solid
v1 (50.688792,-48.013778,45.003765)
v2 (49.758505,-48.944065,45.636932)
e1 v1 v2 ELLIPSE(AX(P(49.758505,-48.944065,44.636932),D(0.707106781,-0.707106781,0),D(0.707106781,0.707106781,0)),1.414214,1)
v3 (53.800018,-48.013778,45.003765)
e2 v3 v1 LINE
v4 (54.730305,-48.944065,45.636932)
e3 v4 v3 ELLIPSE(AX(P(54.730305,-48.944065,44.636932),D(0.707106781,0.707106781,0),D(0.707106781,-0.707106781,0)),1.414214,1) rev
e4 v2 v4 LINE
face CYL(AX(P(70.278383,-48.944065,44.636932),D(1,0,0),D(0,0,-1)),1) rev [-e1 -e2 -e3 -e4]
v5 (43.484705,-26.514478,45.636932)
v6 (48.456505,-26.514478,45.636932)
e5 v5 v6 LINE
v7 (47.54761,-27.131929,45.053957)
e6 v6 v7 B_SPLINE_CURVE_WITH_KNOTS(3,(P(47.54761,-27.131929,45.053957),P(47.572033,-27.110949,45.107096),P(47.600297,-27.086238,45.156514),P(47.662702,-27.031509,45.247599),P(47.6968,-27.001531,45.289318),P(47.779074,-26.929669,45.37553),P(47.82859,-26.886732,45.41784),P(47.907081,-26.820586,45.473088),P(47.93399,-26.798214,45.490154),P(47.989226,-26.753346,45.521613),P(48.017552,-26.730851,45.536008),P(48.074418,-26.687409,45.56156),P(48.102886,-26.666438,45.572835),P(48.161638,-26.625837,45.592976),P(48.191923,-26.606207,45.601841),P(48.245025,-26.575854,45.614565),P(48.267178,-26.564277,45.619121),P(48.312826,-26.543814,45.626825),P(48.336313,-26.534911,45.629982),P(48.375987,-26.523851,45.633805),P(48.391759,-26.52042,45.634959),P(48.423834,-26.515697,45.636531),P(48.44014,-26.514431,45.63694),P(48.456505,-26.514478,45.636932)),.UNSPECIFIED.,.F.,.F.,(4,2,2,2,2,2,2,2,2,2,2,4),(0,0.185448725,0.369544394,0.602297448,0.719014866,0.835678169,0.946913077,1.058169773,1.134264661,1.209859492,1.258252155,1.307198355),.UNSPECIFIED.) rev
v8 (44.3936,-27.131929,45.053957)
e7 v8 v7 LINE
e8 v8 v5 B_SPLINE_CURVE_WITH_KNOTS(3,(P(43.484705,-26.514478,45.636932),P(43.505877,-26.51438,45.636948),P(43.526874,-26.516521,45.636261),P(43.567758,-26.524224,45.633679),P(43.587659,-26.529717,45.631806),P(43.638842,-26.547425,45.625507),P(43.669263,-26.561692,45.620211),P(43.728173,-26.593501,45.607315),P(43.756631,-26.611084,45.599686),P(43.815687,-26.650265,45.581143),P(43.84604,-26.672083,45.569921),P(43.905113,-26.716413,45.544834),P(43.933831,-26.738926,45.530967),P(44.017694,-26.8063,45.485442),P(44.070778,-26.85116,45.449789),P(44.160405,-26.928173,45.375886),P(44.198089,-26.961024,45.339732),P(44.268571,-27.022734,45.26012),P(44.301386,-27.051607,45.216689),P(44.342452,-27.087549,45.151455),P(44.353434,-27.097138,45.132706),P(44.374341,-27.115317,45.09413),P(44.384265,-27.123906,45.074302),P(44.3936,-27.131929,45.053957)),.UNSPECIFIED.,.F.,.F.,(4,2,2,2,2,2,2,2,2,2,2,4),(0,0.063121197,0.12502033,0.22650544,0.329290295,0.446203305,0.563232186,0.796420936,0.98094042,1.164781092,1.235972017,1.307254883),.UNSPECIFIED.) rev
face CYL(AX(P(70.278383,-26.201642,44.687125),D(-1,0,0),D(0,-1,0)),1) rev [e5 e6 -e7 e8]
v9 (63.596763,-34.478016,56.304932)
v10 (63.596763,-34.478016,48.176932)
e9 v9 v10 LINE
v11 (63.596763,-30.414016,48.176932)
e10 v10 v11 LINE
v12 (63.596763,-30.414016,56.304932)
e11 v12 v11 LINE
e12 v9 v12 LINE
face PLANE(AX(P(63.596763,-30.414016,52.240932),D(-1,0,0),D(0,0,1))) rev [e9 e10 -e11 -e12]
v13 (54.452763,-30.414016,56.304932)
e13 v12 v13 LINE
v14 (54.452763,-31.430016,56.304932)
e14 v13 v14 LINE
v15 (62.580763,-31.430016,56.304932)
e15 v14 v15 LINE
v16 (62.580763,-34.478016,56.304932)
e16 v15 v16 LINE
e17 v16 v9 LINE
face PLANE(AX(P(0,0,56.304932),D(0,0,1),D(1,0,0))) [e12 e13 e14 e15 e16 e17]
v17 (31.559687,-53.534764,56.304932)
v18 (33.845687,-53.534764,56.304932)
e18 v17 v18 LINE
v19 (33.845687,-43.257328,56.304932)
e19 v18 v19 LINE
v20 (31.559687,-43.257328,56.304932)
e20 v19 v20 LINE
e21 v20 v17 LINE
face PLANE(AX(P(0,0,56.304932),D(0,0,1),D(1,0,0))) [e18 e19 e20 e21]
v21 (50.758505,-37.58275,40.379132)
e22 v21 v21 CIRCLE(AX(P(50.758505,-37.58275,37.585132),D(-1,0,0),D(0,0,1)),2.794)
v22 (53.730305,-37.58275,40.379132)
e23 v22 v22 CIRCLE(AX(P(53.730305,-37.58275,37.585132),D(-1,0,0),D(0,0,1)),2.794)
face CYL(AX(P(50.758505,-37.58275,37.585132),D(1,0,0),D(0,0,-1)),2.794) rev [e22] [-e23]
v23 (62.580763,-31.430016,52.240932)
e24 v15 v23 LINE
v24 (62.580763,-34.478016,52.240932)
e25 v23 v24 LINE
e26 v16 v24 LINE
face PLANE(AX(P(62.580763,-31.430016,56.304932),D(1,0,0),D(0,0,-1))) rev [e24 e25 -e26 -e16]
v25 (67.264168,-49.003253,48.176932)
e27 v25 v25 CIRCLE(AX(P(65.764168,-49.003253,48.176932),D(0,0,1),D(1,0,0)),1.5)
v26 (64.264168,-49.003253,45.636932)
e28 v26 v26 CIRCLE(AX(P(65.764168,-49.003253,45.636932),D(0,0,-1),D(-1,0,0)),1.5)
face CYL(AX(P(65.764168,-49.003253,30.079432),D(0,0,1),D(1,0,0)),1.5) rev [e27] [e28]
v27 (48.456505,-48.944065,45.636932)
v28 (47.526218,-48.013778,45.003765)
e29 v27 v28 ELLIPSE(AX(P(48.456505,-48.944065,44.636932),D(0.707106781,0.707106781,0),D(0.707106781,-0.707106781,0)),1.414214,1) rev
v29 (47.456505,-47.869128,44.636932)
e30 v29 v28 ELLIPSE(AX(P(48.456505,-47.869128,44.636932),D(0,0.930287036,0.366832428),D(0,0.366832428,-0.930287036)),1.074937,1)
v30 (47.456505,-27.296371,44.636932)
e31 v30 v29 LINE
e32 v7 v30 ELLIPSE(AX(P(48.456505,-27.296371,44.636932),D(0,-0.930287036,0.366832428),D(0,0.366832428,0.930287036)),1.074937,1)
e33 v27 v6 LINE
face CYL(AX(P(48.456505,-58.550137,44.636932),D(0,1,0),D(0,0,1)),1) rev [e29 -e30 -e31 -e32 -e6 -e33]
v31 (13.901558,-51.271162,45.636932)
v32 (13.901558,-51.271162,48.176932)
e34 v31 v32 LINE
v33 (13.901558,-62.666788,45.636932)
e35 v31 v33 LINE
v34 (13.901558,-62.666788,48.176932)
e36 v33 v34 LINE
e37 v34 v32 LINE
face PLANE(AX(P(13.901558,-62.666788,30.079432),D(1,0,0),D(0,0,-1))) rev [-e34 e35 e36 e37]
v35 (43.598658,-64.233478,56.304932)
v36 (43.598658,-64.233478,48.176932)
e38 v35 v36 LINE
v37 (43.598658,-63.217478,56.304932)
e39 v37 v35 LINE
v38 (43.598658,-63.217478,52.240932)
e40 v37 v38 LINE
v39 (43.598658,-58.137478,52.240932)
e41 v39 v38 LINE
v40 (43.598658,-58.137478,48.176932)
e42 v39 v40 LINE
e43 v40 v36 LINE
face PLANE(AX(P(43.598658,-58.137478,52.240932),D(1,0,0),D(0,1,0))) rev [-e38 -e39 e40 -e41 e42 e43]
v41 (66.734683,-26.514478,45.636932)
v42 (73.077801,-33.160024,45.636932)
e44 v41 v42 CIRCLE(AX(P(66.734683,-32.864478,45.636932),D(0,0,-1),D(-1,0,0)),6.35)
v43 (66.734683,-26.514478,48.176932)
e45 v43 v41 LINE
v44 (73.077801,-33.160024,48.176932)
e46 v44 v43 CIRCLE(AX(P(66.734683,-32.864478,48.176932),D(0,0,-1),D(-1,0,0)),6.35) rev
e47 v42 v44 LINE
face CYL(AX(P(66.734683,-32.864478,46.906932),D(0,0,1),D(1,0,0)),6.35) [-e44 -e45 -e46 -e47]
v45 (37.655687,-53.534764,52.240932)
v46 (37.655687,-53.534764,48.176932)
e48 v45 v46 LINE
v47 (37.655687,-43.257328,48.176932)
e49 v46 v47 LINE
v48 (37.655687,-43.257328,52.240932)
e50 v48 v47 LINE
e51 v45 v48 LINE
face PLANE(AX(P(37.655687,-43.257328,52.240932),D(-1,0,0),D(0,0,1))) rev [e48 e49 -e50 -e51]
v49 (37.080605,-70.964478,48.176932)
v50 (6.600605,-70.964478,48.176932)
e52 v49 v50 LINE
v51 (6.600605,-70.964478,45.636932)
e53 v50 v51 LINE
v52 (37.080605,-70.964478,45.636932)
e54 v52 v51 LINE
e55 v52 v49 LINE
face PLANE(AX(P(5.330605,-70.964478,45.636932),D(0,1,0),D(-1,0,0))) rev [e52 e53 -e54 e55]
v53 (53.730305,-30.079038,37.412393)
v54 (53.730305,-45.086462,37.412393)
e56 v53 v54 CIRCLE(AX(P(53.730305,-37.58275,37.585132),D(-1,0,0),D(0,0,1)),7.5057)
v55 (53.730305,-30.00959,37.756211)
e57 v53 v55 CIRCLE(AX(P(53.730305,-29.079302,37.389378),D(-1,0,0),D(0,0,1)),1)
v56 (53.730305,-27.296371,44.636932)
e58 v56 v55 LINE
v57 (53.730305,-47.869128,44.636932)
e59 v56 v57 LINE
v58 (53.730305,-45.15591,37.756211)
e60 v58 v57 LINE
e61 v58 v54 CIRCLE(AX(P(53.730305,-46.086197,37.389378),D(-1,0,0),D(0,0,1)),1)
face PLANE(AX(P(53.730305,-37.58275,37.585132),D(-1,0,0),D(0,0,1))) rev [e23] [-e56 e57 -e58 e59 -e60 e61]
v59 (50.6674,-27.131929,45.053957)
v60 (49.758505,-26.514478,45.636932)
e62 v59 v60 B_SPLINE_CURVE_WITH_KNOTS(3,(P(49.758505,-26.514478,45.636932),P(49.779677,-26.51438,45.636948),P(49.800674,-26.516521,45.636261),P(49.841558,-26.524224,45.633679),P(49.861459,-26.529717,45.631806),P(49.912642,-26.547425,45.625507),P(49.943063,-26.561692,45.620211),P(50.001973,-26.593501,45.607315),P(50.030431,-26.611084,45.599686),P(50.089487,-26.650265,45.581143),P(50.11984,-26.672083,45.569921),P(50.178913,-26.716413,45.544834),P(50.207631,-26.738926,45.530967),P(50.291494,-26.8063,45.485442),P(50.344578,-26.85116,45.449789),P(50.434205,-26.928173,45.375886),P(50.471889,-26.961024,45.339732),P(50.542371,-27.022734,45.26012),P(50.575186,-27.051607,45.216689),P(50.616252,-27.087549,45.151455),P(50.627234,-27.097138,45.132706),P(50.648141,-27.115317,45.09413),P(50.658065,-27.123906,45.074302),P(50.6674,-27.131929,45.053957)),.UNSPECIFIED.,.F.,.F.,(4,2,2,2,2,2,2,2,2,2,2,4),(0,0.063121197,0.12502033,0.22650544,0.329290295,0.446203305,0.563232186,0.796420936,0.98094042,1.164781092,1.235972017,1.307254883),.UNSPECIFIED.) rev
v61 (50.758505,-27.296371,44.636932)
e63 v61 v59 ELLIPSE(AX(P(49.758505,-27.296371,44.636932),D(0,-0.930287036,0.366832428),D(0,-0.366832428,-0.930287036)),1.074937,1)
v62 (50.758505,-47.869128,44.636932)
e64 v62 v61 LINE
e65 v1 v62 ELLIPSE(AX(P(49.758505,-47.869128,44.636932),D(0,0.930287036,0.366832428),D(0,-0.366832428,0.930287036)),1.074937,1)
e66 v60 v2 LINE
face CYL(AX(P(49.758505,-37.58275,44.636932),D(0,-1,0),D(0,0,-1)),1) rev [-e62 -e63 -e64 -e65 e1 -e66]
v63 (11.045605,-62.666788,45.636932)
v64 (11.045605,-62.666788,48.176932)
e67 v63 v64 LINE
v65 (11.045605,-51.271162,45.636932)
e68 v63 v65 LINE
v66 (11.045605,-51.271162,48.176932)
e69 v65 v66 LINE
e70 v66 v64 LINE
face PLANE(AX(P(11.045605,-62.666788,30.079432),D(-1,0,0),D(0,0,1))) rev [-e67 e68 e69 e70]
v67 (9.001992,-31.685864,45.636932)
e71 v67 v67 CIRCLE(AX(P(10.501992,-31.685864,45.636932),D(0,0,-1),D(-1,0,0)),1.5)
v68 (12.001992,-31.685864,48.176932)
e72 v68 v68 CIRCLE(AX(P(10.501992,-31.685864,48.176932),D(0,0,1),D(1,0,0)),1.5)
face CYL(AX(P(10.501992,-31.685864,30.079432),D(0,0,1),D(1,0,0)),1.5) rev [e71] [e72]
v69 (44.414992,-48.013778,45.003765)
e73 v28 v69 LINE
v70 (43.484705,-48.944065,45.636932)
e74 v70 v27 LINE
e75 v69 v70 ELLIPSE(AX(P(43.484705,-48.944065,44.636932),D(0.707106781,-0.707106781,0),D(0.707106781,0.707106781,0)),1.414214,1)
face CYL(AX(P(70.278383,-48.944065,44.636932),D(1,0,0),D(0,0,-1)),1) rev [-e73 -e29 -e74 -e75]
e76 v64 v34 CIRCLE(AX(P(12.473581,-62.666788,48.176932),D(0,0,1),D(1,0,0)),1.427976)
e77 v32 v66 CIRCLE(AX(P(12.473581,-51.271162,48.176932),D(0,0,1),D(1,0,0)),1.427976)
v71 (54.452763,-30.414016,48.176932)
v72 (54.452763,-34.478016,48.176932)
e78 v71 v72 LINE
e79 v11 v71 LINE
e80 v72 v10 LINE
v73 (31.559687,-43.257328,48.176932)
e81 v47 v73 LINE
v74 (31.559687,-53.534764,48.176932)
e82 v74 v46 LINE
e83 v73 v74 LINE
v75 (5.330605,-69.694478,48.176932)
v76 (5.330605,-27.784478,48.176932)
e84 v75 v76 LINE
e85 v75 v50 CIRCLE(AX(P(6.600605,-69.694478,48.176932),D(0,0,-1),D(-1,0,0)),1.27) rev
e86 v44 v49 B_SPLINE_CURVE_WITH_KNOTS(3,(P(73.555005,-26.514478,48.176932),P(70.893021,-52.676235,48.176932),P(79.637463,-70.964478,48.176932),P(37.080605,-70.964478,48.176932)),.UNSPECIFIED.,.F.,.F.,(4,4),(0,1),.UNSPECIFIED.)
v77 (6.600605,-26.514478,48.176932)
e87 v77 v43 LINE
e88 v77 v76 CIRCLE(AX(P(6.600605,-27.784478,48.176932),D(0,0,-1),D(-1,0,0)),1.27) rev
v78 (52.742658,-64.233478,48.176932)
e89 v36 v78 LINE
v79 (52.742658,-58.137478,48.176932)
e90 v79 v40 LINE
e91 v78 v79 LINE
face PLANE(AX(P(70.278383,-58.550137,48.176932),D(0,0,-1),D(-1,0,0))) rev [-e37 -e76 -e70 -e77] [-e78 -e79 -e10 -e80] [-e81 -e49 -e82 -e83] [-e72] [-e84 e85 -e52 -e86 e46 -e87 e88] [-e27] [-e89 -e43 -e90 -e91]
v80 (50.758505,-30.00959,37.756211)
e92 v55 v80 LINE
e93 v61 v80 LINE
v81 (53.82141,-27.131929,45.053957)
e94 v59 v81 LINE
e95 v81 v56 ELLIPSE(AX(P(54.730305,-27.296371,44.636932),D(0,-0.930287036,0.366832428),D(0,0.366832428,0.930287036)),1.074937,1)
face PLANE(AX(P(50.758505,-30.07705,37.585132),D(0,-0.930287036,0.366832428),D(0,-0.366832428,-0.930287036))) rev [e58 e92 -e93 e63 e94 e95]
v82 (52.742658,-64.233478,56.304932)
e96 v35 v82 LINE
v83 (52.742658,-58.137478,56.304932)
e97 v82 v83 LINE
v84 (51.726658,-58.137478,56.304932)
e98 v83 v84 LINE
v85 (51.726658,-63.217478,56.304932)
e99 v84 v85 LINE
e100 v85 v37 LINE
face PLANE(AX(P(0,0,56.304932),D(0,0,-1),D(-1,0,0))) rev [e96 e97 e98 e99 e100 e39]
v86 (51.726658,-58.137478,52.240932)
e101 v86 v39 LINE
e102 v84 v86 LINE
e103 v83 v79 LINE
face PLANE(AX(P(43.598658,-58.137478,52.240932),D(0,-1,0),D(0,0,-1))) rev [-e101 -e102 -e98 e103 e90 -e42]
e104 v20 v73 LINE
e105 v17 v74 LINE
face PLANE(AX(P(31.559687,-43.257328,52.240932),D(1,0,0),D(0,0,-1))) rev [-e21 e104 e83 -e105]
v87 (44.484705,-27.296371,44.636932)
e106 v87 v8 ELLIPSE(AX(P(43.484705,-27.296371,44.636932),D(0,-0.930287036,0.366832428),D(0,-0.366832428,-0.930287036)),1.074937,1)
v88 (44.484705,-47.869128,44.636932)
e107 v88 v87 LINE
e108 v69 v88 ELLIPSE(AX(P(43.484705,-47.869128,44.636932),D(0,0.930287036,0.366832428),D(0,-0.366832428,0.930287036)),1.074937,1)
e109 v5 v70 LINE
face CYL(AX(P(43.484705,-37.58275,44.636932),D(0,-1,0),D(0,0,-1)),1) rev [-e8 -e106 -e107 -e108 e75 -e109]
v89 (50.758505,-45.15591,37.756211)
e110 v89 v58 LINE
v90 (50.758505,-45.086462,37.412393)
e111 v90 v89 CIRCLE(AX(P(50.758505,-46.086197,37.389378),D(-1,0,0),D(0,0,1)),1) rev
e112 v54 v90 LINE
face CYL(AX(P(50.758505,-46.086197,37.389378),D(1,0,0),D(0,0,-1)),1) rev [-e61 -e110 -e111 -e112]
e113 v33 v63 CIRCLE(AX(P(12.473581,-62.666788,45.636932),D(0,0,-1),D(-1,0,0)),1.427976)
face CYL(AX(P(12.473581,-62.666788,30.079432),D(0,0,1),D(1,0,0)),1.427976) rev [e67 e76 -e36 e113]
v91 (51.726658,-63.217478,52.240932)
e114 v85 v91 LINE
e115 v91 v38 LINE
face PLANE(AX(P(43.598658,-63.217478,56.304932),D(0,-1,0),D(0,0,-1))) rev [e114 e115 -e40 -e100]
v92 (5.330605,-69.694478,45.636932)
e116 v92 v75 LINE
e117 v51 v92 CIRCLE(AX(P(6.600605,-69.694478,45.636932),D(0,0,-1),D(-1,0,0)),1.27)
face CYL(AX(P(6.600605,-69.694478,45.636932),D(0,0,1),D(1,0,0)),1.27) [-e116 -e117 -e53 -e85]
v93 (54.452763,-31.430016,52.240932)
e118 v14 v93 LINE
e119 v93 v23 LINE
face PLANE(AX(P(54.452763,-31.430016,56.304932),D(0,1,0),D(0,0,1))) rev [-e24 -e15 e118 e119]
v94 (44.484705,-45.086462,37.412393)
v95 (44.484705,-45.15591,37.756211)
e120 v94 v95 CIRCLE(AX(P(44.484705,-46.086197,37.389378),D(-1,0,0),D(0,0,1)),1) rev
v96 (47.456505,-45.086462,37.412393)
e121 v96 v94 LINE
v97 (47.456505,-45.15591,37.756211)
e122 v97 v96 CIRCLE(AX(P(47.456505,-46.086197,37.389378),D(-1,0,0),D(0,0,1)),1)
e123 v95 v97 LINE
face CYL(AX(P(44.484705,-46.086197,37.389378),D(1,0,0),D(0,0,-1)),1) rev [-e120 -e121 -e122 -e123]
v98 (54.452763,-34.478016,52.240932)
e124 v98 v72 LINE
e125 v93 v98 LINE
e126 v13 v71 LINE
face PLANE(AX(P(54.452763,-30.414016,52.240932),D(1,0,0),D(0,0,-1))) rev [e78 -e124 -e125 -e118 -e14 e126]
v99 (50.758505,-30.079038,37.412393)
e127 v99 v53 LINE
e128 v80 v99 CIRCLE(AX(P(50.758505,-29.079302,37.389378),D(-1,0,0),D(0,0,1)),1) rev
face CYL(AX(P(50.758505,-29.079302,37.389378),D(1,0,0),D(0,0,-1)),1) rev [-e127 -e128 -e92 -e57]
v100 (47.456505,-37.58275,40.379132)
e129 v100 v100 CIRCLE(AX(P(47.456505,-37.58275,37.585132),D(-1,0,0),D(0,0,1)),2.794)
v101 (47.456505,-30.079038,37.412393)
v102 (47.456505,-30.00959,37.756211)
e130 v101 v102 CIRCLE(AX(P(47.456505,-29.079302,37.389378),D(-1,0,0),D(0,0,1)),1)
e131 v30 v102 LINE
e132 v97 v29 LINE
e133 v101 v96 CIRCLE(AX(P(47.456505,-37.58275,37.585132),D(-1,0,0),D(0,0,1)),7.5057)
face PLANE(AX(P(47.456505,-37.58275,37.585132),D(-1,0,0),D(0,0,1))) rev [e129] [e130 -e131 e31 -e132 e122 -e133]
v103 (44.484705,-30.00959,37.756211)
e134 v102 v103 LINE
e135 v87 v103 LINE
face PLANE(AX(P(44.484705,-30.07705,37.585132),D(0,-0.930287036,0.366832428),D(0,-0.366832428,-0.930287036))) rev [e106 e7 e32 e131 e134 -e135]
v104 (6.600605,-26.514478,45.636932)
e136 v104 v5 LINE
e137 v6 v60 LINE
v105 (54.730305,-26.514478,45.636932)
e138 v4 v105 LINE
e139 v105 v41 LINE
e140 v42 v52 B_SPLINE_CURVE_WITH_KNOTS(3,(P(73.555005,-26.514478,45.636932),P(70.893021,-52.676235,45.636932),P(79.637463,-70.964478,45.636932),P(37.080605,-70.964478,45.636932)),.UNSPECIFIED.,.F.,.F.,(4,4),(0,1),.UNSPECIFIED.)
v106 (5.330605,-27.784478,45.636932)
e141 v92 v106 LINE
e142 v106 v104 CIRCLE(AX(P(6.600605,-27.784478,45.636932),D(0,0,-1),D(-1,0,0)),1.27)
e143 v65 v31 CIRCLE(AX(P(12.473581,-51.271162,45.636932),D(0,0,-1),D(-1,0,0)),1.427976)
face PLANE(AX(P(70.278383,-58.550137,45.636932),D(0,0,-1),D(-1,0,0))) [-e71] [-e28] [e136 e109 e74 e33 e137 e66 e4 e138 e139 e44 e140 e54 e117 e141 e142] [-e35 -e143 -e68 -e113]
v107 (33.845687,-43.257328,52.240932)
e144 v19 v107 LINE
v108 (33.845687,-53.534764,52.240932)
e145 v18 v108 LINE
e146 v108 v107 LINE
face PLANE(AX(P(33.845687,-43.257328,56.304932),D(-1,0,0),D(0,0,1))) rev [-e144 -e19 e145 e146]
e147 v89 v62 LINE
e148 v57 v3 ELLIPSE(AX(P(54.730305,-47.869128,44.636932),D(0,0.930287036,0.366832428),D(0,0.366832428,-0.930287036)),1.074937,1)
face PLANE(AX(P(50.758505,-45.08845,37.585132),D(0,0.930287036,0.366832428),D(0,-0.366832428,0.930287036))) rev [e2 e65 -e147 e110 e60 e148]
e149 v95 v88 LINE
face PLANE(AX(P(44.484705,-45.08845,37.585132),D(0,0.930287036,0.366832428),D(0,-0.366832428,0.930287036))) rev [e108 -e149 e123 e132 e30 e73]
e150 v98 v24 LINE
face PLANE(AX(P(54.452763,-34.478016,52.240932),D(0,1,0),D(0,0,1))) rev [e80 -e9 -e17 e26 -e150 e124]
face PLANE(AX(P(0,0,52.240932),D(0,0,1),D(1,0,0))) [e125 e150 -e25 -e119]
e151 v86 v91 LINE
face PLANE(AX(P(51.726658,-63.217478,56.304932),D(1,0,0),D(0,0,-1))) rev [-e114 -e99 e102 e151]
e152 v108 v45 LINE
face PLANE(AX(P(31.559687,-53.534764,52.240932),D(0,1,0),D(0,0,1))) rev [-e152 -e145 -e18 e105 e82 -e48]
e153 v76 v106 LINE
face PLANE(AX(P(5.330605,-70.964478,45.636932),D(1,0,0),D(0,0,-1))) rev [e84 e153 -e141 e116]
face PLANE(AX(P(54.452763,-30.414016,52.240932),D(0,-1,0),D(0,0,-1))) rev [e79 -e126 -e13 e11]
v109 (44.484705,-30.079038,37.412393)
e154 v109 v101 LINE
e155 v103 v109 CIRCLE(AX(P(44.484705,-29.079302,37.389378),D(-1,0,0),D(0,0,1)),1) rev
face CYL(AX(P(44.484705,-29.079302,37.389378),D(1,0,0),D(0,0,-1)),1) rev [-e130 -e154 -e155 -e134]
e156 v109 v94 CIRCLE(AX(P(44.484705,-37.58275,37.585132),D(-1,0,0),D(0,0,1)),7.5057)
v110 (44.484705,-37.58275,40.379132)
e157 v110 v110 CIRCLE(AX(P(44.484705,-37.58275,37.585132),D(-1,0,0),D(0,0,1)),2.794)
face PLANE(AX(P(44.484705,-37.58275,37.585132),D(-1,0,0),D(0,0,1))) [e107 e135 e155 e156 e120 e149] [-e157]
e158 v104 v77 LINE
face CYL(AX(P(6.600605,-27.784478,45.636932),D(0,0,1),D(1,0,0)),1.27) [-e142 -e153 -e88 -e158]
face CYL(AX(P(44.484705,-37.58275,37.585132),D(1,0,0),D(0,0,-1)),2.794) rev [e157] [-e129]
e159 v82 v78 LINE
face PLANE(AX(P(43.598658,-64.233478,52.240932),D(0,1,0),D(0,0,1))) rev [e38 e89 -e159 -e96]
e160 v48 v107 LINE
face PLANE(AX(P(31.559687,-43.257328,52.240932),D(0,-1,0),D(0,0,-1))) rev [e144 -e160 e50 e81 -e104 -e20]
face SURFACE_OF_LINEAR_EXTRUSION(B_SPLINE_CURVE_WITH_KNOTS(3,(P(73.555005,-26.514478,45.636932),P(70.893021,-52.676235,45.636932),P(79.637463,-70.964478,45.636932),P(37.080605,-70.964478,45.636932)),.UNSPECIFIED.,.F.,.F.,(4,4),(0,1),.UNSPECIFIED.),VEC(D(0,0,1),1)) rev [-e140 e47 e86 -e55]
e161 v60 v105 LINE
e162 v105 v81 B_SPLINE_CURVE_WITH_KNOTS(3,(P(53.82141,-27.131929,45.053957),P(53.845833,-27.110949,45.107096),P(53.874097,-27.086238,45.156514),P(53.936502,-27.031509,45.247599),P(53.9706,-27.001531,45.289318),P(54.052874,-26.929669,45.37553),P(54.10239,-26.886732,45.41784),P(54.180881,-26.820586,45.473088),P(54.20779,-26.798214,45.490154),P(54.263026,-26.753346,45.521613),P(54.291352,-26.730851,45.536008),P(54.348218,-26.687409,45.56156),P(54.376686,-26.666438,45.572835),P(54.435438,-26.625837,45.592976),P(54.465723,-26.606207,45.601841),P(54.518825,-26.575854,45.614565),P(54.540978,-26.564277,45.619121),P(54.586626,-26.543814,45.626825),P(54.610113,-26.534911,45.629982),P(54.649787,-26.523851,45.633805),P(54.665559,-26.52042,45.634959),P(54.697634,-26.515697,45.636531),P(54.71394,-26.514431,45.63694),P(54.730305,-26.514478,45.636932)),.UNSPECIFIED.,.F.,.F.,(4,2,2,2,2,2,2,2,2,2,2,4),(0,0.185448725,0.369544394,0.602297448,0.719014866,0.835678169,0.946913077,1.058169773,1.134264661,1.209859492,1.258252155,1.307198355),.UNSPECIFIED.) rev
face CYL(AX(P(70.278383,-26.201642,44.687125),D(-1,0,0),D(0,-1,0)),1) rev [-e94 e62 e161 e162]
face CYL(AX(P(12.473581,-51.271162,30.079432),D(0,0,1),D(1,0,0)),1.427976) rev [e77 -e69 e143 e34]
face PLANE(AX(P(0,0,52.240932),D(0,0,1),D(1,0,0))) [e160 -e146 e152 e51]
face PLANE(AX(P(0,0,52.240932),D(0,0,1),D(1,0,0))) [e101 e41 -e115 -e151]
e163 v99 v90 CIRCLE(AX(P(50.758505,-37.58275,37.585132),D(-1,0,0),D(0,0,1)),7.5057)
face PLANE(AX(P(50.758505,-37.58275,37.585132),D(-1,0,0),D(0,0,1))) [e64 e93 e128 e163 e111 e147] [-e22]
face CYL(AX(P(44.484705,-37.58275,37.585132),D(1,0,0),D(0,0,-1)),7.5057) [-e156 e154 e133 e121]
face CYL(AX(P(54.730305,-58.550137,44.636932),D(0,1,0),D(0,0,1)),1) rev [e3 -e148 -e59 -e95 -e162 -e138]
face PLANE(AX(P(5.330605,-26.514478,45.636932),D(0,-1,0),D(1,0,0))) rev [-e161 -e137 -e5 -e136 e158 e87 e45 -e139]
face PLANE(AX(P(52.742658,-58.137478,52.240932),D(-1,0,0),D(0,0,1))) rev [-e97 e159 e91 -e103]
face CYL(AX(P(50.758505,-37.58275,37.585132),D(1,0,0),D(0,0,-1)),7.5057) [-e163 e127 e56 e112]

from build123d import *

# Parameters (mm, degrees)
BOSS_EXTRUDE1_DEPTH = 2.54
SKETCH8_R           = 2.794
BOSS_EXTRUDE5_DEPTH = 1.4859
SKETCH9_R           = 2.794
BOSS_EXTRUDE6_DEPTH = 1.4859
FILLET1_R           = 6.35
FILLET2_R           = 1.27
SKETCH11_R          = 1.5
CUT_EXTRUDE1_DEPTH  = 104.464232939
CUT_EXTRUDE3_DEPTH  = 104.464232939
SKETCH14_W          = 9.144
SKETCH14_H          = 6.096
SKETCH14_W_2        = 6.096
SKETCH14_H_2        = 10.277436068
SKETCH14_H_3        = 4.064
BOSS_EXTRUDE7_DEPTH = 4.064
SKETCH15_W          = 2.286
SKETCH15_H          = 10.277436068
BOSS_EXTRUDE8_DEPTH = 4.064
FILLET3_R           = 1


with BuildPart() as part:
    # Sketch3 → Boss-Extrude1 (new body)
    with BuildSketch(Plane(origin=(0, 0, 48.176932074), x_dir=(-1, 0, 0), z_dir=(0, 0, -1))):
        with BuildLine():
            Line((-5.330605085, -70.964477634), (-5.330605085, -26.514477634))
            Line((-5.330605085, -26.514477634), (-73.555005085, -26.514477634))
            add(Edge.make_bspline(
                [(-37.080605085, -70.964477634), (-79.637463047, -70.964477634), (-70.893021391, -52.676234808), (-73.555005085, -26.514477634)],
                knots=[0, 0, 0, 0, 1, 1, 1, 1], degree=3))
            Line((-37.080605085, -70.964477634), (-5.330605085, -70.964477634))
        make_face()
    extrude(amount=BOSS_EXTRUDE1_DEPTH)

    # Sketch8 → Boss-Extrude5 (add, symmetric)
    with BuildSketch(Plane.ZY.offset(-45.970605085)):
        with BuildLine():
            Line((45.636932074, -45.088449611), (45.636932074, -30.077049611))
            Line((45.636932074, -30.077049611), (45.636932074, -26.902049611))
            Line((45.636932074, -26.902049611), (37.585132074, -30.077049611))
            ThreePointArc((37.585132074, -30.077049611), (30.079432074, -37.582749611), (37.585132074, -45.088449611))
            Line((37.585132074, -45.088449611), (45.636932074, -48.263449611))
            Line((45.636932074, -48.263449611), (45.636932074, -45.088449611))
        make_face()
        with Locations((37.585132074, -37.582749611)):
            Circle(SKETCH8_R, mode=Mode.SUBTRACT)
    extrude(amount=BOSS_EXTRUDE5_DEPTH, both=True)

    # Sketch9 → Boss-Extrude6 (add, symmetric)
    with BuildSketch(Plane.ZY.offset(-52.244405085)):
        with BuildLine():
            Line((37.585132074, -30.077049611), (45.636932074, -26.902049611))
            Line((45.636932074, -26.902049611), (45.636932074, -30.077049611))
            Line((45.636932074, -30.077049611), (45.636932074, -45.088449611))
            Line((45.636932074, -45.088449611), (45.636932074, -48.263449611))
            Line((45.636932074, -48.263449611), (37.585132074, -45.088449611))
            ThreePointArc((37.585132074, -45.088449611), (30.079432074, -37.582749611), (37.585132074, -30.077049611))
        make_face()
        with Locations((37.585132074, -37.582749611)):
            Circle(SKETCH9_R, mode=Mode.SUBTRACT)
    extrude(amount=BOSS_EXTRUDE6_DEPTH, both=True)

    # Fillet1
    fillet1_edges = [part.edges().sort_by_distance(p)[0] for p in [
        (73.555005085, -26.514477634, 46.906932074),
    ]]
    fillet(fillet1_edges, radius=FILLET1_R)

    # Fillet2
    fillet2_edges = [part.edges().sort_by_distance(p)[0] for p in [
        (5.330605085, -26.514477634, 46.906932074),
        (5.330605085, -70.964477634, 46.906932074),
    ]]
    fillet(fillet2_edges, radius=FILLET2_R)

    # Sketch11 → Cut-Extrude1 (cut, through all)
    with BuildSketch(Plane.XY.offset(48.176932074)):
        with Locations((10.501991532, -31.685864082)):
            Circle(SKETCH11_R)
        with Locations((65.764167989, -49.003253007)):
            Circle(SKETCH11_R)
    extrude(amount=-CUT_EXTRUDE1_DEPTH, mode=Mode.SUBTRACT)

    # Sketch13 → Cut-Extrude3 (cut, through all)
    with BuildSketch(Plane.XY.offset(48.176932074)):
        with BuildLine():
            Line((11.045605085, -62.666787944), (11.045605085, -51.271162116))
            ThreePointArc((11.045605085, -51.271162116), (12.473581383, -49.843185817), (13.901557682, -51.271162116))
            Line((13.901557682, -51.271162116), (13.901557682, -62.666787944))
            ThreePointArc((13.901557682, -62.666787944), (12.473581383, -64.094764243), (11.045605085, -62.666787944))
        make_face()
    extrude(amount=-CUT_EXTRUDE3_DEPTH, mode=Mode.SUBTRACT)

    # Sketch14 → Boss-Extrude7 (add)
    with BuildSketch(Plane.XY.offset(48.176932074)):
        with Locations((48.170658264, -61.185477634)):
            Rectangle(SKETCH14_W, SKETCH14_H)
        with Locations((34.607686971, -48.396046186)):
            Rectangle(SKETCH14_W_2, SKETCH14_H_2)
        with Locations((59.024762651, -32.446016036)):
            Rectangle(SKETCH14_W, SKETCH14_H_3)
    extrude(amount=BOSS_EXTRUDE7_DEPTH)

    # Sketch15 → Boss-Extrude8 (add)
    with BuildSketch(Plane.XY.offset(52.240932074)):
        with Locations((32.702686971, -48.396046186)):
            Rectangle(SKETCH15_W, SKETCH15_H)
        Polygon((54.452762651, -30.414016036), (54.452762651, -31.430016036), (62.580762651, -31.430016036), (62.580762651, -34.478016036), (63.596762651, -34.478016036), (63.596762651, -30.414016036), align=None)
        Polygon((43.598658264, -63.217477634), (51.726658264, -63.217477634), (51.726658264, -58.137477634), (52.742658264, -58.137477634), (52.742658264, -64.233477634), (43.598658264, -64.233477634), align=None)
    extrude(amount=BOSS_EXTRUDE8_DEPTH)

    # Fillet3
    # the kernel refuses this fillet: 1 mm, written as the material it adds along each edge
    with BuildSketch(Plane(origin=(44.484705085, -24.402049611, 45.636932074), x_dir=(-1, 0, 0), z_dir=(0, -1, 0))) as fillet3_piece_1_section:
        with BuildLine():
            CenterArc((FILLET3_R, FILLET3_R), FILLET3_R, 180, 90)
            Line((0, FILLET3_R), (-FILLET3_R * 0.02, FILLET3_R))
            Line((-FILLET3_R * 0.02, FILLET3_R), (-FILLET3_R * 0.02, -FILLET3_R * 0.02))
            Line((-FILLET3_R * 0.02, -FILLET3_R * 0.02), (FILLET3_R, -FILLET3_R * 0.02))
            Line((FILLET3_R, -FILLET3_R * 0.02), (FILLET3_R, 0))
        make_face()
    fillet3_piece_1 = extrude(amount=26.3614, mode=Mode.PRIVATE)
    fillet3_piece_1 = split(fillet3_piece_1, bisect_by=Plane(origin=(44.257287749, -28.415977986, 41.797609716), z_dir=(0, -0.9302870363838799, 0.36683242759616796)), keep=Keep.TOP, mode=Mode.PRIVATE)
    fillet3_piece_1 = split(fillet3_piece_1, bisect_by=Plane(origin=(44.257287749, -46.749521237, 41.797609716), z_dir=(0, 0.9302870363838802, 0.36683242759616724)), keep=Keep.TOP, mode=Mode.PRIVATE)
    add(fillet3_piece_1)
    with BuildSketch(Plane(origin=(47.456505085, -30.077049611, 37.585132074), x_dir=(0, -0.011507965676518926, -0.9999337811705274), z_dir=(-1, 0, 0)), Plane(origin=(44.484705085, -45.088449611, 37.585132074), x_dir=(0, 0.011507965676519873, -0.9999337811705273), z_dir=(1, 0, 0)), Plane(origin=(53.730305085, -30.077049611, 37.585132074), x_dir=(0, -0.011507965676498363, -0.9999337811705276), z_dir=(-1, 0, 0))) as fillet3_piece_2:
        with BuildLine():
            CenterArc((0.184258642, -0.999933781), FILLET3_R, 90.659372418, 20.20165218)
            Line((-0.171843783, -0.065486852), (-0.178965832, -0.046797914))
            Line((-0.178965832, -0.046797914), (-0.007122049, 0.018688939))
            Line((-0.007122049, 0.018688939), (0.000230159, 0.019998676))
            ThreePointArc((0.000230159, 0.019998676), (0.086375338, 0.019502981), (0.172520517, 0.019998676))
            Line((0.172520517, 0.019998676), (0.172750676, 0))
        make_face()
    extrude(amount=2.9718)
    with BuildSketch(Plane(origin=(47.456505085, -50.763449611, 45.636932074), x_dir=(1, 0, 0), z_dir=(0, 1, 0))) as fillet3_piece_3_section:
        with BuildLine():
            CenterArc((FILLET3_R, FILLET3_R), FILLET3_R, 180, 90)
            Line((0, FILLET3_R), (-FILLET3_R * 0.02, FILLET3_R))
            Line((-FILLET3_R * 0.02, FILLET3_R), (-FILLET3_R * 0.02, -FILLET3_R * 0.02))
            Line((-FILLET3_R * 0.02, -FILLET3_R * 0.02), (FILLET3_R, -FILLET3_R * 0.02))
            Line((FILLET3_R, -FILLET3_R * 0.02), (FILLET3_R, 0))
        make_face()
    fillet3_piece_3 = extrude(amount=26.3614, mode=Mode.PRIVATE)
    fillet3_piece_3 = split(fillet3_piece_3, bisect_by=Plane(origin=(47.68392242, -28.415977986, 41.797609716), z_dir=(0, -0.9302870363838799, 0.36683242759616796)), keep=Keep.TOP, mode=Mode.PRIVATE)
    fillet3_piece_3 = split(fillet3_piece_3, bisect_by=Plane(origin=(47.68392242, -46.749521237, 41.797609716), z_dir=(0, 0.9302870363838802, 0.36683242759616724)), keep=Keep.TOP, mode=Mode.PRIVATE)
    add(fillet3_piece_3)
    with BuildSketch(Plane(origin=(44.484705085, -48.263449611, 45.636932074), x_dir=(0, -1, 0), z_dir=(1, 0, 0)), Plane(origin=(50.758505085, -48.263449611, 45.636932074), x_dir=(0, -1, 0), z_dir=(1, 0, 0))) as fillet3_piece_4:
        with BuildLine():
            CenterArc((FILLET3_R * 0.680615280704, FILLET3_R), FILLET3_R, 201.520397017, 68.479602983)
            Line((-FILLET3_R * 0.24967175568, FILLET3_R * 0.633167572404), (-FILLET3_R * 0.268277496407, FILLET3_R * 0.625830923852))
            Line((-FILLET3_R * 0.268277496407, FILLET3_R * 0.625830923852), (-FILLET3_R * 0.0136123056141, -FILLET3_R * 0.02))
            Line((-FILLET3_R * 0.0136123056141, -FILLET3_R * 0.02), (FILLET3_R * 0.680615280704, -FILLET3_R * 0.02))
            Line((FILLET3_R * 0.680615280704, -FILLET3_R * 0.02), (FILLET3_R * 0.680615280704, 0))
        make_face()
    extrude(amount=2.9718)
    with BuildSketch(Plane(origin=(47.456505085, -26.902049611, 45.636932074), x_dir=(0, 1, 0), z_dir=(-1, 0, 0))) as fillet3_piece_5:
        with BuildLine():
            CenterArc((0.700407326, 0.949807372), FILLET3_R, 201.520397017, 50.249417843)
            Line((-0.22987971, 0.582974945), (-0.248485451, 0.575638296))
            Line((-0.248485451, 0.575638296), (-0.018605741, -0.007336649))
            Line((-0.018605741, -0.007336649), (0, -0.02))
            ThreePointArc((0, -0.02), (0.193785989, -0.02), (0.38131527, -0.018996147))
            Line((0.38131527, -0.018996147), (0.387571977, 0))
        make_face()
    extrude(amount=2.9718)
    with BuildSketch(Plane(origin=(50.758505085, -24.402049611, 45.636932074), x_dir=(-1, 0, 0), z_dir=(0, -1, 0))) as fillet3_piece_6_section:
        with BuildLine():
            CenterArc((FILLET3_R, FILLET3_R), FILLET3_R, 180, 90)
            Line((0, FILLET3_R), (-FILLET3_R * 0.02, FILLET3_R))
            Line((-FILLET3_R * 0.02, FILLET3_R), (-FILLET3_R * 0.02, -FILLET3_R * 0.02))
            Line((-FILLET3_R * 0.02, -FILLET3_R * 0.02), (FILLET3_R, -FILLET3_R * 0.02))
            Line((FILLET3_R, -FILLET3_R * 0.02), (FILLET3_R, 0))
        make_face()
    fillet3_piece_6 = extrude(amount=26.3614, mode=Mode.PRIVATE)
    fillet3_piece_6 = split(fillet3_piece_6, bisect_by=Plane(origin=(50.531087749, -46.749521237, 41.797609716), z_dir=(0, 0.9302870363838802, 0.36683242759616724)), keep=Keep.TOP, mode=Mode.PRIVATE)
    fillet3_piece_6 = split(fillet3_piece_6, bisect_by=Plane(origin=(50.531087749, -28.415977986, 41.797609716), z_dir=(0, -0.9302870363838799, 0.36683242759616835)), keep=Keep.TOP, mode=Mode.PRIVATE)
    add(fillet3_piece_6)
    with BuildSketch(Plane(origin=(50.758505085, -26.902049611, 45.636932074), x_dir=(0, 1, 0), z_dir=(1, 0, 0))) as fillet3_piece_7:
        with BuildLine():
            CenterArc((0.700407326, -0.949807372), FILLET3_R, 108.23018514, 50.249417843)
            Line((-0.22987971, -0.582974945), (-0.248485451, -0.575638296))
            Line((-0.248485451, -0.575638296), (-0.018605741, 0.007336649))
            Line((-0.018605741, 0.007336649), (0, 0.02))
            ThreePointArc((0, 0.02), (0.193785989, 0.02), (0.38131527, 0.018996147))
            Line((0.38131527, 0.018996147), (0.387571977, 0))
        make_face()
    extrude(amount=2.9718)
    with BuildSketch(Plane(origin=(53.730305085, -45.088449611, 37.585132074), x_dir=(0, -0.3668324275961554, 0.9302870363838848), z_dir=(-1, 0, 0))) as fillet3_piece_8:
        with BuildLine():
            CenterArc((0.183898923, -1), FILLET3_R, 90, 20.20165218)
            Line((-0.161426339, -0.061516935), (-0.168332844, -0.042747273))
            ThreePointArc((-0.168332844, -0.042747273), (-0.087658228, -0.012533966), (-0.007336649, 0.018605741))
            Line((-0.007336649, 0.018605741), (0, 0.02))
            Line((0, 0.02), (0.183898923, 0.02))
            Line((0.183898923, 0.02), (0.183898923, 0))
        make_face()
    extrude(amount=2.9718)
    with BuildSketch(Plane(origin=(53.730305085, -50.763449611, 45.636932074), x_dir=(1, 0, 0), z_dir=(0, 1, 0))) as fillet3_piece_9_section:
        with BuildLine():
            CenterArc((FILLET3_R, FILLET3_R), FILLET3_R, 180, 90)
            Line((0, FILLET3_R), (-FILLET3_R * 0.02, FILLET3_R))
            Line((-FILLET3_R * 0.02, FILLET3_R), (-FILLET3_R * 0.02, -FILLET3_R * 0.02))
            Line((-FILLET3_R * 0.02, -FILLET3_R * 0.02), (FILLET3_R, -FILLET3_R * 0.02))
            Line((FILLET3_R, -FILLET3_R * 0.02), (FILLET3_R, 0))
        make_face()
    fillet3_piece_9 = extrude(amount=26.3614, mode=Mode.PRIVATE)
    fillet3_piece_9 = split(fillet3_piece_9, bisect_by=Plane(origin=(53.95772242, -46.749521237, 41.797609716), z_dir=(0, 0.9302870363838802, 0.36683242759616724)), keep=Keep.TOP, mode=Mode.PRIVATE)
    fillet3_piece_9 = split(fillet3_piece_9, bisect_by=Plane(origin=(53.95772242, -28.415977986, 41.797609716), z_dir=(0, -0.9302870363838799, 0.36683242759616835)), keep=Keep.TOP, mode=Mode.PRIVATE)
    add(fillet3_piece_9)
    with BuildSketch(Plane(origin=(47.456505085, -26.902049611, 45.636932074), x_dir=(0, 1, 0), z_dir=(-1, 0, 0))) as fillet3_piece_10a_section:
        with BuildLine():
            CenterArc((0.700407326, 0.949807372), FILLET3_R, 201.520397017, 50.249417843)
            Line((-0.22987971, 0.582974945), (-0.248485451, 0.575638296))
            Line((-0.248485451, 0.575638296), (-0.018605741, -0.007336649))
            Line((-0.018605741, -0.007336649), (0, -0.02))
            ThreePointArc((0, -0.02), (0.193785989, -0.02), (0.38131527, -0.018996147))
            Line((0.38131527, -0.018996147), (0.387571977, 0))
        make_face()
    fillet3_piece_10a = extrude(amount=4.538453414, mode=Mode.PRIVATE)
    fillet3_piece_10a = split(fillet3_piece_10a, bisect_by=Plane(origin=(44.484705085, -26.864445024, 45.495418853), z_dir=(-1, 0, 0)), keep=Keep.TOP, mode=Mode.PRIVATE)
    with BuildSketch(Plane(origin=(44.484705085, -24.402049611, 45.636932074), x_dir=(-1, 0, 0), z_dir=(0, -1, 0))) as fillet3_piece_10b_section:
        with BuildLine():
            CenterArc((FILLET3_R, FILLET3_R), FILLET3_R, 180, 90)
            Line((0, FILLET3_R), (-FILLET3_R * 0.02, FILLET3_R))
            Line((-FILLET3_R * 0.02, FILLET3_R), (-FILLET3_R * 0.02, -FILLET3_R * 0.02))
            Line((-FILLET3_R * 0.02, -FILLET3_R * 0.02), (FILLET3_R, -FILLET3_R * 0.02))
            Line((FILLET3_R, -FILLET3_R * 0.02), (FILLET3_R, 0))
        make_face()
    fillet3_piece_10b = extrude(amount=26.3614, mode=Mode.PRIVATE)
    fillet3_piece_10b = split(fillet3_piece_10b, bisect_by=Plane(origin=(44.281015021, -26.514477634, 45.372103573), z_dir=(0, -1, 0)), keep=Keep.TOP, mode=Mode.PRIVATE)
    fillet3_piece_10b = split(fillet3_piece_10b, bisect_by=Plane(origin=(44.281015021, -26.973374036, 45.456053333), z_dir=(0, 0.9302870363838799, -0.36683242759616796)), keep=Keep.TOP, mode=Mode.PRIVATE)
    fillet3_piece_10 = fillet3_piece_10a & fillet3_piece_10b
    add(fillet3_piece_10)
    with BuildSketch(Plane(origin=(42.783166883, -48.263449611, 45.636932074), x_dir=(0, -1, 0), z_dir=(1, 0, 0))) as fillet3_piece_11a_section:
        with BuildLine():
            CenterArc((FILLET3_R * 0.680615280704, FILLET3_R), FILLET3_R, 201.520397017, 68.479602983)
            Line((-FILLET3_R * 0.24967175568, FILLET3_R * 0.633167572404), (-FILLET3_R * 0.268277496407, FILLET3_R * 0.625830923852))
            Line((-FILLET3_R * 0.268277496407, FILLET3_R * 0.625830923852), (-FILLET3_R * 0.0136123056141, -FILLET3_R * 0.02))
            Line((-FILLET3_R * 0.0136123056141, -FILLET3_R * 0.02), (FILLET3_R * 0.680615280704, -FILLET3_R * 0.02))
            Line((FILLET3_R * 0.680615280704, -FILLET3_R * 0.02), (FILLET3_R * 0.680615280704, 0))
        make_face()
    fillet3_piece_11a = extrude(amount=4.673338202, mode=Mode.PRIVATE)
    fillet3_piece_11a = split(fillet3_piece_11a, bisect_by=Plane(origin=(44.484705085, -48.357764725, 45.498358762), z_dir=(-1, 0, 0)), keep=Keep.TOP, mode=Mode.PRIVATE)
    with BuildSketch(Plane(origin=(44.484705085, -24.402049611, 45.636932074), x_dir=(-1, 0, 0), z_dir=(0, -1, 0))) as fillet3_piece_11b_section:
        with BuildLine():
            CenterArc((FILLET3_R, FILLET3_R), FILLET3_R, 180, 90)
            Line((0, FILLET3_R), (-FILLET3_R * 0.02, FILLET3_R))
            Line((-FILLET3_R * 0.02, FILLET3_R), (-FILLET3_R * 0.02, -FILLET3_R * 0.02))
            Line((-FILLET3_R * 0.02, -FILLET3_R * 0.02), (FILLET3_R, -FILLET3_R * 0.02))
            Line((FILLET3_R, -FILLET3_R * 0.02), (FILLET3_R, 0))
        make_face()
    fillet3_piece_11b = extrude(amount=26.3614, mode=Mode.PRIVATE)
    fillet3_piece_11b = split(fillet3_piece_11b, bisect_by=Plane(origin=(44.262491368, -48.345787947, 45.845742093), z_dir=(0, -0.9302870363838802, -0.36683242759616724)), keep=Keep.TOP, mode=Mode.PRIVATE)
    fillet3_piece_11 = fillet3_piece_11a & fillet3_piece_11b
    add(fillet3_piece_11)
    with BuildSketch(Plane(origin=(47.456505085, -50.763449611, 45.636932074), x_dir=(1, 0, 0), z_dir=(0, 1, 0))) as fillet3_piece_12a_section:
        with BuildLine():
            CenterArc((FILLET3_R, FILLET3_R), FILLET3_R, 180, 90)
            Line((0, FILLET3_R), (-FILLET3_R * 0.02, FILLET3_R))
            Line((-FILLET3_R * 0.02, FILLET3_R), (-FILLET3_R * 0.02, -FILLET3_R * 0.02))
            Line((-FILLET3_R * 0.02, -FILLET3_R * 0.02), (FILLET3_R, -FILLET3_R * 0.02))
            Line((FILLET3_R, -FILLET3_R * 0.02), (FILLET3_R, 0))
        make_face()
    fillet3_piece_12a = extrude(amount=26.3614, mode=Mode.PRIVATE)
    fillet3_piece_12a = split(fillet3_piece_12a, bisect_by=Plane(origin=(47.678718801, -48.345787947, 45.845742093), z_dir=(0, -0.9302870363838802, -0.36683242759616724)), keep=Keep.TOP, mode=Mode.PRIVATE)
    with BuildSketch(Plane(origin=(44.484705085, -48.263449611, 45.636932074), x_dir=(0, -1, 0), z_dir=(1, 0, 0))) as fillet3_piece_12b_section:
        with BuildLine():
            CenterArc((FILLET3_R * 0.680615280704, FILLET3_R), FILLET3_R, 201.520397017, 68.479602983)
            Line((-FILLET3_R * 0.24967175568, FILLET3_R * 0.633167572404), (-FILLET3_R * 0.268277496407, FILLET3_R * 0.625830923852))
            Line((-FILLET3_R * 0.268277496407, FILLET3_R * 0.625830923852), (-FILLET3_R * 0.0136123056141, -FILLET3_R * 0.02))
            Line((-FILLET3_R * 0.0136123056141, -FILLET3_R * 0.02), (FILLET3_R * 0.680615280704, -FILLET3_R * 0.02))
            Line((FILLET3_R * 0.680615280704, -FILLET3_R * 0.02), (FILLET3_R * 0.680615280704, 0))
        make_face()
    fillet3_piece_12b = extrude(amount=4.673338202, mode=Mode.PRIVATE)
    fillet3_piece_12b = split(fillet3_piece_12b, bisect_by=Plane(origin=(47.456505085, -48.357764725, 45.498358762), z_dir=(1, 0, 0)), keep=Keep.TOP, mode=Mode.PRIVATE)
    fillet3_piece_12 = fillet3_piece_12a & fillet3_piece_12b
    add(fillet3_piece_12)
    with BuildSketch(Plane(origin=(47.456505085, -50.763449611, 45.636932074), x_dir=(1, 0, 0), z_dir=(0, 1, 0))) as fillet3_piece_13a_section:
        with BuildLine():
            CenterArc((FILLET3_R, FILLET3_R), FILLET3_R, 180, 90)
            Line((0, FILLET3_R), (-FILLET3_R * 0.02, FILLET3_R))
            Line((-FILLET3_R * 0.02, FILLET3_R), (-FILLET3_R * 0.02, -FILLET3_R * 0.02))
            Line((-FILLET3_R * 0.02, -FILLET3_R * 0.02), (FILLET3_R, -FILLET3_R * 0.02))
            Line((FILLET3_R, -FILLET3_R * 0.02), (FILLET3_R, 0))
        make_face()
    fillet3_piece_13a = extrude(amount=26.3614, mode=Mode.PRIVATE)
    fillet3_piece_13a = split(fillet3_piece_13a, bisect_by=Plane(origin=(47.660195148, -26.514477634, 45.372103573), z_dir=(0, -1, 0)), keep=Keep.TOP, mode=Mode.PRIVATE)
    fillet3_piece_13a = split(fillet3_piece_13a, bisect_by=Plane(origin=(47.660195148, -26.973374036, 45.456053333), z_dir=(0, 0.9302870363838799, -0.36683242759616796)), keep=Keep.TOP, mode=Mode.PRIVATE)
    with BuildSketch(Plane(origin=(49.023158499, -26.902049611, 45.636932074), x_dir=(0, 1, 0), z_dir=(-1, 0, 0))) as fillet3_piece_13b_section:
        with BuildLine():
            CenterArc((0.700407326, 0.949807372), FILLET3_R, 201.520397017, 50.249417843)
            Line((-0.22987971, 0.582974945), (-0.248485451, 0.575638296))
            Line((-0.248485451, 0.575638296), (-0.018605741, -0.007336649))
            Line((-0.018605741, -0.007336649), (0, -0.02))
            ThreePointArc((0, -0.02), (0.193785989, -0.02), (0.38131527, -0.018996147))
            Line((0.38131527, -0.018996147), (0.387571977, 0))
        make_face()
    fillet3_piece_13b = extrude(amount=4.538453414, mode=Mode.PRIVATE)
    fillet3_piece_13b = split(fillet3_piece_13b, bisect_by=Plane(origin=(47.456505085, -26.864445024, 45.495418853), z_dir=(1, 0, 0)), keep=Keep.TOP, mode=Mode.PRIVATE)
    fillet3_piece_13 = fillet3_piece_13a & fillet3_piece_13b
    add(fillet3_piece_13)
    with BuildSketch(Plane(origin=(49.19185167, -26.902049611, 45.636932074), x_dir=(0, 1, 0), z_dir=(1, 0, 0))) as fillet3_piece_14a_section:
        with BuildLine():
            CenterArc((0.700407326, -0.949807372), FILLET3_R, 108.23018514, 50.249417843)
            Line((-0.22987971, -0.582974945), (-0.248485451, -0.575638296))
            Line((-0.248485451, -0.575638296), (-0.018605741, 0.007336649))
            Line((-0.018605741, 0.007336649), (0, 0.02))
            ThreePointArc((0, 0.02), (0.193785989, 0.02), (0.38131527, 0.018996147))
            Line((0.38131527, 0.018996147), (0.387571977, 0))
        make_face()
    fillet3_piece_14a = extrude(amount=4.538453414, mode=Mode.PRIVATE)
    fillet3_piece_14a = split(fillet3_piece_14a, bisect_by=Plane(origin=(50.758505085, -26.864445024, 45.495418853), z_dir=(-1, 0, 0)), keep=Keep.TOP, mode=Mode.PRIVATE)
    with BuildSketch(Plane(origin=(50.758505085, -24.402049611, 45.636932074), x_dir=(-1, 0, 0), z_dir=(0, -1, 0))) as fillet3_piece_14b_section:
        with BuildLine():
            CenterArc((FILLET3_R, FILLET3_R), FILLET3_R, 180, 90)
            Line((0, FILLET3_R), (-FILLET3_R * 0.02, FILLET3_R))
            Line((-FILLET3_R * 0.02, FILLET3_R), (-FILLET3_R * 0.02, -FILLET3_R * 0.02))
            Line((-FILLET3_R * 0.02, -FILLET3_R * 0.02), (FILLET3_R, -FILLET3_R * 0.02))
            Line((FILLET3_R, -FILLET3_R * 0.02), (FILLET3_R, 0))
        make_face()
    fillet3_piece_14b = extrude(amount=26.3614, mode=Mode.PRIVATE)
    fillet3_piece_14b = split(fillet3_piece_14b, bisect_by=Plane(origin=(50.554815021, -26.514477634, 45.372103573), z_dir=(0, -1, 0)), keep=Keep.TOP, mode=Mode.PRIVATE)
    fillet3_piece_14b = split(fillet3_piece_14b, bisect_by=Plane(origin=(50.554815021, -26.973374036, 45.456053333), z_dir=(0, 0.9302870363838799, -0.36683242759616835)), keep=Keep.TOP, mode=Mode.PRIVATE)
    fillet3_piece_14 = fillet3_piece_14a & fillet3_piece_14b
    add(fillet3_piece_14)
    with BuildSketch(Plane(origin=(50.758505085, -24.402049611, 45.636932074), x_dir=(-1, 0, 0), z_dir=(0, -1, 0))) as fillet3_piece_15a_section:
        with BuildLine():
            CenterArc((FILLET3_R, FILLET3_R), FILLET3_R, 180, 90)
            Line((0, FILLET3_R), (-FILLET3_R * 0.02, FILLET3_R))
            Line((-FILLET3_R * 0.02, FILLET3_R), (-FILLET3_R * 0.02, -FILLET3_R * 0.02))
            Line((-FILLET3_R * 0.02, -FILLET3_R * 0.02), (FILLET3_R, -FILLET3_R * 0.02))
            Line((FILLET3_R, -FILLET3_R * 0.02), (FILLET3_R, 0))
        make_face()
    fillet3_piece_15a = extrude(amount=26.3614, mode=Mode.PRIVATE)
    fillet3_piece_15a = split(fillet3_piece_15a, bisect_by=Plane(origin=(50.536291368, -48.345787947, 45.845742093), z_dir=(0, -0.9302870363838802, -0.36683242759616724)), keep=Keep.TOP, mode=Mode.PRIVATE)
    with BuildSketch(Plane(origin=(49.056966883, -48.263449611, 45.636932074), x_dir=(0, -1, 0), z_dir=(1, 0, 0))) as fillet3_piece_15b_section:
        with BuildLine():
            CenterArc((FILLET3_R * 0.680615280704, FILLET3_R), FILLET3_R, 201.520397017, 68.479602983)
            Line((-FILLET3_R * 0.24967175568, FILLET3_R * 0.633167572404), (-FILLET3_R * 0.268277496407, FILLET3_R * 0.625830923852))
            Line((-FILLET3_R * 0.268277496407, FILLET3_R * 0.625830923852), (-FILLET3_R * 0.0136123056141, -FILLET3_R * 0.02))
            Line((-FILLET3_R * 0.0136123056141, -FILLET3_R * 0.02), (FILLET3_R * 0.680615280704, -FILLET3_R * 0.02))
            Line((FILLET3_R * 0.680615280704, -FILLET3_R * 0.02), (FILLET3_R * 0.680615280704, 0))
        make_face()
    fillet3_piece_15b = extrude(amount=4.673338202, mode=Mode.PRIVATE)
    fillet3_piece_15b = split(fillet3_piece_15b, bisect_by=Plane(origin=(50.758505085, -48.357764725, 45.498358762), z_dir=(-1, 0, 0)), keep=Keep.TOP, mode=Mode.PRIVATE)
    fillet3_piece_15 = fillet3_piece_15a & fillet3_piece_15b
    add(fillet3_piece_15)
    with BuildSketch(Plane(origin=(50.758505085, -26.902049611, 45.636932074), x_dir=(0, 1, 0), z_dir=(1, 0, 0))) as fillet3_piece_16a_section:
        with BuildLine():
            CenterArc((0.700407326, -0.949807372), FILLET3_R, 108.23018514, 50.249417843)
            Line((-0.22987971, -0.582974945), (-0.248485451, -0.575638296))
            Line((-0.248485451, -0.575638296), (-0.018605741, 0.007336649))
            Line((-0.018605741, 0.007336649), (0, 0.02))
            ThreePointArc((0, 0.02), (0.193785989, 0.02), (0.38131527, 0.018996147))
            Line((0.38131527, 0.018996147), (0.387571977, 0))
        make_face()
    fillet3_piece_16a = extrude(amount=4.538453414, mode=Mode.PRIVATE)
    fillet3_piece_16a = split(fillet3_piece_16a, bisect_by=Plane(origin=(53.730305085, -26.864445024, 45.495418853), z_dir=(1, 0, 0)), keep=Keep.TOP, mode=Mode.PRIVATE)
    with BuildSketch(Plane(origin=(53.730305085, -50.763449611, 45.636932074), x_dir=(1, 0, 0), z_dir=(0, 1, 0))) as fillet3_piece_16b_section:
        with BuildLine():
            CenterArc((FILLET3_R, FILLET3_R), FILLET3_R, 180, 90)
            Line((0, FILLET3_R), (-FILLET3_R * 0.02, FILLET3_R))
            Line((-FILLET3_R * 0.02, FILLET3_R), (-FILLET3_R * 0.02, -FILLET3_R * 0.02))
            Line((-FILLET3_R * 0.02, -FILLET3_R * 0.02), (FILLET3_R, -FILLET3_R * 0.02))
            Line((FILLET3_R, -FILLET3_R * 0.02), (FILLET3_R, 0))
        make_face()
    fillet3_piece_16b = extrude(amount=26.3614, mode=Mode.PRIVATE)
    fillet3_piece_16b = split(fillet3_piece_16b, bisect_by=Plane(origin=(53.933995148, -26.514477634, 45.372103573), z_dir=(0, -1, 0)), keep=Keep.TOP, mode=Mode.PRIVATE)
    fillet3_piece_16b = split(fillet3_piece_16b, bisect_by=Plane(origin=(53.933995148, -26.973374036, 45.456053333), z_dir=(0, 0.9302870363838799, -0.36683242759616835)), keep=Keep.TOP, mode=Mode.PRIVATE)
    fillet3_piece_16 = fillet3_piece_16a & fillet3_piece_16b
    add(fillet3_piece_16)
    with BuildSketch(Plane(origin=(53.730305085, -50.763449611, 45.636932074), x_dir=(1, 0, 0), z_dir=(0, 1, 0))) as fillet3_piece_17a_section:
        with BuildLine():
            CenterArc((FILLET3_R, FILLET3_R), FILLET3_R, 180, 90)
            Line((0, FILLET3_R), (-FILLET3_R * 0.02, FILLET3_R))
            Line((-FILLET3_R * 0.02, FILLET3_R), (-FILLET3_R * 0.02, -FILLET3_R * 0.02))
            Line((-FILLET3_R * 0.02, -FILLET3_R * 0.02), (FILLET3_R, -FILLET3_R * 0.02))
            Line((FILLET3_R, -FILLET3_R * 0.02), (FILLET3_R, 0))
        make_face()
    fillet3_piece_17a = extrude(amount=26.3614, mode=Mode.PRIVATE)
    fillet3_piece_17a = split(fillet3_piece_17a, bisect_by=Plane(origin=(53.952518801, -48.345787947, 45.845742093), z_dir=(0, -0.9302870363838802, -0.36683242759616724)), keep=Keep.TOP, mode=Mode.PRIVATE)
    with BuildSketch(Plane(origin=(50.758505085, -48.263449611, 45.636932074), x_dir=(0, -1, 0), z_dir=(1, 0, 0))) as fillet3_piece_17b_section:
        with BuildLine():
            CenterArc((FILLET3_R * 0.680615280704, FILLET3_R), FILLET3_R, 201.520397017, 68.479602983)
            Line((-FILLET3_R * 0.24967175568, FILLET3_R * 0.633167572404), (-FILLET3_R * 0.268277496407, FILLET3_R * 0.625830923852))
            Line((-FILLET3_R * 0.268277496407, FILLET3_R * 0.625830923852), (-FILLET3_R * 0.0136123056141, -FILLET3_R * 0.02))
            Line((-FILLET3_R * 0.0136123056141, -FILLET3_R * 0.02), (FILLET3_R * 0.680615280704, -FILLET3_R * 0.02))
            Line((FILLET3_R * 0.680615280704, -FILLET3_R * 0.02), (FILLET3_R * 0.680615280704, 0))
        make_face()
    fillet3_piece_17b = extrude(amount=4.673338202, mode=Mode.PRIVATE)
    fillet3_piece_17b = split(fillet3_piece_17b, bisect_by=Plane(origin=(53.730305085, -48.357764725, 45.498358762), z_dir=(1, 0, 0)), keep=Keep.TOP, mode=Mode.PRIVATE)
    fillet3_piece_17 = fillet3_piece_17a & fillet3_piece_17b
    add(fillet3_piece_17)


solid = part.part
